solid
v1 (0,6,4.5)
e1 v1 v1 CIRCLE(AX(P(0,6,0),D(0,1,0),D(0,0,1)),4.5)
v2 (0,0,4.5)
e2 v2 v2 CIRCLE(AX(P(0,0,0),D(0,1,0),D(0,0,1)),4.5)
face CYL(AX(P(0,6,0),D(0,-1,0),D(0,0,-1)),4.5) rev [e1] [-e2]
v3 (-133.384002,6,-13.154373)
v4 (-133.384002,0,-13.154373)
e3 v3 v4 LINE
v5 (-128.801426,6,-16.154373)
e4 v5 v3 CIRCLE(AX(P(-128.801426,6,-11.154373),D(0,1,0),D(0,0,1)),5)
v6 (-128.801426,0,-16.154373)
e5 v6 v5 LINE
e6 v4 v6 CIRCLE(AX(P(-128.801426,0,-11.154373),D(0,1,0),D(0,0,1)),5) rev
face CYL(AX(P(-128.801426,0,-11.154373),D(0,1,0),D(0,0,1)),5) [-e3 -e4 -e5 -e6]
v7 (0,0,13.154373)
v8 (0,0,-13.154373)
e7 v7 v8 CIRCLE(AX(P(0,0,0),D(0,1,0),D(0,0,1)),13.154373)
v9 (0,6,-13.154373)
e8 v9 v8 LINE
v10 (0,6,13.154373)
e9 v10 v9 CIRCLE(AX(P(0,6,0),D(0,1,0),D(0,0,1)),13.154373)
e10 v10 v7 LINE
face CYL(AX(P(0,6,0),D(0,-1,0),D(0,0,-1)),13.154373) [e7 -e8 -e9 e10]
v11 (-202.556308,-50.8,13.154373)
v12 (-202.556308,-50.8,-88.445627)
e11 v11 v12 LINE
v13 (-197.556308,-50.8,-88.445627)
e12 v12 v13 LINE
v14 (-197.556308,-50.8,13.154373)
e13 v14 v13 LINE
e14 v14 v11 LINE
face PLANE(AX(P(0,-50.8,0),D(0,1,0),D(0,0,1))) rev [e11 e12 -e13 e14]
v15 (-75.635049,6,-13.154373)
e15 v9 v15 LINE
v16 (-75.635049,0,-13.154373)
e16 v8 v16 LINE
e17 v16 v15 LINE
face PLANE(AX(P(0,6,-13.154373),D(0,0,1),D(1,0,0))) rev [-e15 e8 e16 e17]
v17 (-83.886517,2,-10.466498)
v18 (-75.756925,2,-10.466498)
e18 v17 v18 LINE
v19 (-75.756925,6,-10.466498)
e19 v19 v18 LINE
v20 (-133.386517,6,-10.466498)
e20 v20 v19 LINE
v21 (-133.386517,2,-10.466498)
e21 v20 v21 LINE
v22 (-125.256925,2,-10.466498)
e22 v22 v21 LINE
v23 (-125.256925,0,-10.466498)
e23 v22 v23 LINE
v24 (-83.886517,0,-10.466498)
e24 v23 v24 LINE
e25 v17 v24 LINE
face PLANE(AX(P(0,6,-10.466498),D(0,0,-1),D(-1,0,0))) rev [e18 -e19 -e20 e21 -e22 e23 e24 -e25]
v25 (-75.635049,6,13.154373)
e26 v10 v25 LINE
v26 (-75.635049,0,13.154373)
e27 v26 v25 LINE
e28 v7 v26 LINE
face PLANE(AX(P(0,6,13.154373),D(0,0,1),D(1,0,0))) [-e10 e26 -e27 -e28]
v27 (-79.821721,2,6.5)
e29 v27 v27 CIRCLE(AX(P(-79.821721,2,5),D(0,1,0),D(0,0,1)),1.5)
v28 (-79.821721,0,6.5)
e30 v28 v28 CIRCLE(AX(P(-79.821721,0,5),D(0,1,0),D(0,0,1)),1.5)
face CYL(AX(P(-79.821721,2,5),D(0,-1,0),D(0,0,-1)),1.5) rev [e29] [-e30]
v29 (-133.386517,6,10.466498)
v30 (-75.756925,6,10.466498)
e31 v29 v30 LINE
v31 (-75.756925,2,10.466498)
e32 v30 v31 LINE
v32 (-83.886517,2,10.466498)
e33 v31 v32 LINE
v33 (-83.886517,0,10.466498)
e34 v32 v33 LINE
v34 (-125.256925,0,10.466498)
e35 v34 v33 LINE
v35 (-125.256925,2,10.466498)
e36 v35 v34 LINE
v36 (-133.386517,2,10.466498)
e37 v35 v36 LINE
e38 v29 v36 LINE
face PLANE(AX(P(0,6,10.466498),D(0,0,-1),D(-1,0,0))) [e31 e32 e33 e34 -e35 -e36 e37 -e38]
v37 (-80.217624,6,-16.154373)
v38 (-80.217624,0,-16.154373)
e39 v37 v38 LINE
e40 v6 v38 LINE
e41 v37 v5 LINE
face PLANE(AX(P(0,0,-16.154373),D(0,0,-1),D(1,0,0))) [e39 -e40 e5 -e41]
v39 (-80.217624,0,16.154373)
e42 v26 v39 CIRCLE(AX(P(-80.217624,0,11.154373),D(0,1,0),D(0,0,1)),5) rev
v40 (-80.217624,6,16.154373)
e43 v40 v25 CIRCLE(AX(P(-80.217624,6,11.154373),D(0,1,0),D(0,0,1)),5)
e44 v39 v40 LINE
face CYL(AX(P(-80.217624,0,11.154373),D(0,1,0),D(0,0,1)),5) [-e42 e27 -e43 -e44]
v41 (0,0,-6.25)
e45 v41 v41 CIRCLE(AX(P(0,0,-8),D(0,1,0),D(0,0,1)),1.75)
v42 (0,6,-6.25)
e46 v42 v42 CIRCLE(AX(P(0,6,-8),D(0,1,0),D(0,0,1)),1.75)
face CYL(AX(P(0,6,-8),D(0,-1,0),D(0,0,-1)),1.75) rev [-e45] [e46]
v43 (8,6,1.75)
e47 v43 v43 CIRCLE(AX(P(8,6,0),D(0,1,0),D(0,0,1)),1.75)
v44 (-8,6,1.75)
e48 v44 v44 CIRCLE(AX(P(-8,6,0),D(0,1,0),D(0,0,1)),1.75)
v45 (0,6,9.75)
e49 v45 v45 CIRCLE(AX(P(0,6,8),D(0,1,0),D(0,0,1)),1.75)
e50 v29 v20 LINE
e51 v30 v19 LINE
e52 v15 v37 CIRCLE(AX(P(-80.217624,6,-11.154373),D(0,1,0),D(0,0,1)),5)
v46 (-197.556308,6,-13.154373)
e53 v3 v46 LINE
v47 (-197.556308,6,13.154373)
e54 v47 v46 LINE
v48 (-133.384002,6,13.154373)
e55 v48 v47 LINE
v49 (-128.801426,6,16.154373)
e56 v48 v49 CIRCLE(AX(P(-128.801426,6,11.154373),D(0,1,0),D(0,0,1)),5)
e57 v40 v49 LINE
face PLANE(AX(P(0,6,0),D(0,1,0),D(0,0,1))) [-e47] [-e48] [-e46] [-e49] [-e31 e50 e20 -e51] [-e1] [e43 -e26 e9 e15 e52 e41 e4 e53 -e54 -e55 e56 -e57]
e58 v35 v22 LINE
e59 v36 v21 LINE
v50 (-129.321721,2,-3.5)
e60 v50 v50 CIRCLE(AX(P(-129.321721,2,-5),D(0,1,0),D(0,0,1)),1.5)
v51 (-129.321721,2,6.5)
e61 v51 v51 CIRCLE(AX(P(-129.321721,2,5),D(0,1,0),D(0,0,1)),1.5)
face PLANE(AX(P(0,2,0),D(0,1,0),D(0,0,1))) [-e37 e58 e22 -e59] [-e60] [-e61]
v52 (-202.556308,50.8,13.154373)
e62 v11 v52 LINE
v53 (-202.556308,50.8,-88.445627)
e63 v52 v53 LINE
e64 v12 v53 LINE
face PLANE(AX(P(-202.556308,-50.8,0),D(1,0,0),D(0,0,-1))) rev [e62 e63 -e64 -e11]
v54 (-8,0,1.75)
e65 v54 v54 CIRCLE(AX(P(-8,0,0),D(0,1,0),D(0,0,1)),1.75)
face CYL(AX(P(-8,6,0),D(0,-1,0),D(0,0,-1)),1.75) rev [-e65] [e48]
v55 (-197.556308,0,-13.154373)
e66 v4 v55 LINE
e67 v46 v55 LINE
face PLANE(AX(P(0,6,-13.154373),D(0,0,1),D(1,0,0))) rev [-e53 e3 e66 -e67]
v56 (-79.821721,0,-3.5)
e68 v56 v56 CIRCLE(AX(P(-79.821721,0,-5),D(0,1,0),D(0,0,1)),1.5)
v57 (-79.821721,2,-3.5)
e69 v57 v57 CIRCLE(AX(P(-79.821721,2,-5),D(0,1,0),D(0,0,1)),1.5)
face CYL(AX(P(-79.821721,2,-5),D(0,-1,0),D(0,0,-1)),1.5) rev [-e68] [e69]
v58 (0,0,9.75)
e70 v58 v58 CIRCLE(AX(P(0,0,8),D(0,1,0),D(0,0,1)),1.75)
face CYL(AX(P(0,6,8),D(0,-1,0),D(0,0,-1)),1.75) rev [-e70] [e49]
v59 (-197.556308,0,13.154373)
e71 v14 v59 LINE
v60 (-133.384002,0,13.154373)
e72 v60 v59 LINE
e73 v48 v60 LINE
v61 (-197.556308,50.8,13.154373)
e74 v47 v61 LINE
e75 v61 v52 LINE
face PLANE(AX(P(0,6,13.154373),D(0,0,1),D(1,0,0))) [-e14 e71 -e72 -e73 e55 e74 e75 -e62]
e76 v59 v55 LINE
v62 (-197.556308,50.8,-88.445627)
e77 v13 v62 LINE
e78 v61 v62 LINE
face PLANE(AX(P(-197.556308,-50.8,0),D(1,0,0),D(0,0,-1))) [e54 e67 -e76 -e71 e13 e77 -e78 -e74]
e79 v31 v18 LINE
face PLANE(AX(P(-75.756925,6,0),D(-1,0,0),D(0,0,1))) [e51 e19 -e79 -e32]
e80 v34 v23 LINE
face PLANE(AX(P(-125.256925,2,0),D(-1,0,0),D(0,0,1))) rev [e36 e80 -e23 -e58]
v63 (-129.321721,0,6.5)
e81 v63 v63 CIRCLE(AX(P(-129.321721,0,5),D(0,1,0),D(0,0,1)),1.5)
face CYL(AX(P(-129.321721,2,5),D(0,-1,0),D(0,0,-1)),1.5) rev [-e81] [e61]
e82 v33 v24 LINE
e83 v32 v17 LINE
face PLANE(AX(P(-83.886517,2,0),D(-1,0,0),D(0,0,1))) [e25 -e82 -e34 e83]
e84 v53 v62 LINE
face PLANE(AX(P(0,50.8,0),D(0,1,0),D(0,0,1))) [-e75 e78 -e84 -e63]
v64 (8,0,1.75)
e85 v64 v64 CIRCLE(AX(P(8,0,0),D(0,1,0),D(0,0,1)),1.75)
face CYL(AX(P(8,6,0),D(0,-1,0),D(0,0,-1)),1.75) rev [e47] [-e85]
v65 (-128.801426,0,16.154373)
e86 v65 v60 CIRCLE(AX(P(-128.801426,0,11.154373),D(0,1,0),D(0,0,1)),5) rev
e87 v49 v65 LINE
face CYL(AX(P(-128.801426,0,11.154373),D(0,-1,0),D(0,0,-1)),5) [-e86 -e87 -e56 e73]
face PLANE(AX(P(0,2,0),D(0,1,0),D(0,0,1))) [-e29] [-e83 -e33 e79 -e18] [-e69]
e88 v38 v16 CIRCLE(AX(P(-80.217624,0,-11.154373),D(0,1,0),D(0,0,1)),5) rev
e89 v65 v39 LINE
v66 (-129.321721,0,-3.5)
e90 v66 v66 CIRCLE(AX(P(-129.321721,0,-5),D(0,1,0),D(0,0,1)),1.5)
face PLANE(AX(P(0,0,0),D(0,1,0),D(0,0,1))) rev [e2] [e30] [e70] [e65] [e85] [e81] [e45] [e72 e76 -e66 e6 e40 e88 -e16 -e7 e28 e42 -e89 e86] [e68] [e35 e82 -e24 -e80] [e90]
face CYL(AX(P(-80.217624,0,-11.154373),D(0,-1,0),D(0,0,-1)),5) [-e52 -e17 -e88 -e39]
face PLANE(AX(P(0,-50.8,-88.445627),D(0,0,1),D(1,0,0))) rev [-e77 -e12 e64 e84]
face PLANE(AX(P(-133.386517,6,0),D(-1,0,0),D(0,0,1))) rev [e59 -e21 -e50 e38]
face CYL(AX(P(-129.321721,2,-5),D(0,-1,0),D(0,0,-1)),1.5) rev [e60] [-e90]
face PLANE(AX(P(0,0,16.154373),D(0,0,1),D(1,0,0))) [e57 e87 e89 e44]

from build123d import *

# Parameters (mm, degrees)
SKETCH1_W                = 57.629592668
SKETCH1_H                = 21.211867522
SKETCH1_R                = 1.75
SKETCH1_R_2              = 4.5
BOSS_EXTRUDE1_DEPTH      = 6
SKETCH1_22_W             = 8.129592668
SKETCH1_22_H             = 21.211867522
SKETCH1_22_R             = 1.5
BOSS_EXTRUDE2_DEPTH      = 2
BOSS_EXTRUDE3_DEPTH      = 50.8
BOSS_EXTRUDE3_DEPTH_BACK = 50.8
SKETCH1_23_W             = 5
SKETCH1_23_H             = 75.291254256
SKETCH1_23_H_2           = 26.308745744
SKETCH4_W                = 57.748953374
SKETCH4_H                = 6
BOSS_EXTRUDE4_DEPTH      = 3
FILLET2_R                = 5
FILLET2_OF_MIRROR1_R     = 5


with BuildPart() as part:
    # Sketch1 → Boss-Extrude1 (new body)
    with BuildSketch(Plane(origin=(0, 0, 0), x_dir=(1, 0, 0), z_dir=(0, 1, 0))):
        with BuildLine():
            Line((-197.556308439, -13.154372872), (0, -13.154372872))
            ThreePointArc((0, -13.154372872), (13.154372872, 0), (0, 13.154372872))
            Line((0, 13.154372872), (-197.556308439, 13.154372872))
            Line((-197.556308439, 13.154372872), (-197.556308439, -13.154372872))
        make_face()
        with Locations((-104.57172107, -0.139435446)):
            Rectangle(SKETCH1_W, SKETCH1_H, mode=Mode.SUBTRACT)
        with Locations(Location((0, 8, 0), (0, 0, 270))):
            Circle(SKETCH1_R, mode=Mode.SUBTRACT)
        with Locations(Location((0, -8, 0), (0, 0, 270))):
            Circle(SKETCH1_R, mode=Mode.SUBTRACT)
        with Locations(Location((-8, 0, 0), (0, 0, 270))):
            Circle(SKETCH1_R, mode=Mode.SUBTRACT)
        with Locations(Location((0, 0, 0), (0, 0, 270))):
            Circle(SKETCH1_R_2, mode=Mode.SUBTRACT)
        with Locations(Location((8, 0, 0), (0, 0, 270))):
            Circle(SKETCH1_R, mode=Mode.SUBTRACT)
    boss_extrude1 = extrude(amount=BOSS_EXTRUDE1_DEPTH)

    # Sketch1<22> → Boss-Extrude2 (add)
    # profile 1 of 2: a face of its own
    with BuildSketch(Plane(origin=(0, 0, 0), x_dir=(1, 0, 0), z_dir=(0, 1, 0))):
        with Locations((-129.32172107, -0.139435446)):
            Rectangle(SKETCH1_22_W, SKETCH1_22_H)
        with Locations(Location((-129.32172107, -5, 0), (0, 0, 270))):
            Circle(SKETCH1_22_R, mode=Mode.SUBTRACT)
        with Locations(Location((-129.32172107, 5, 0), (0, 0, 270))):
            Circle(SKETCH1_22_R, mode=Mode.SUBTRACT)
    # profile 2 of 2: a face of its own
    with BuildSketch(Plane(origin=(0, 0, 0), x_dir=(1, 0, 0), z_dir=(0, 1, 0))):
        with Locations((-79.82172107, -0.139435446)):
            Rectangle(SKETCH1_22_W, SKETCH1_22_H)
        with Locations(Location((-79.82172107, -5, 0), (0, 0, 270))):
            Circle(SKETCH1_22_R, mode=Mode.SUBTRACT)
        with Locations(Location((-79.82172107, 5, 0), (0, 0, 270))):
            Circle(SKETCH1_22_R, mode=Mode.SUBTRACT)
    extrude(amount=BOSS_EXTRUDE2_DEPTH)

    # Sketch1<23> → Boss-Extrude3 (add, two sides: drawn at the far end of the back side and taken through both)
    with BuildSketch(Plane(origin=(0, 0, 0), x_dir=(1, 0, 0), z_dir=(0, 1, 0)).offset(-BOSS_EXTRUDE3_DEPTH_BACK)):
        with Locations((-200.056308439, 50.8)):
            Rectangle(SKETCH1_23_W, SKETCH1_23_H)
        with Locations((-200.056308439, 0)):
            Rectangle(SKETCH1_23_W, SKETCH1_23_H_2)
    extrude(amount=BOSS_EXTRUDE3_DEPTH + BOSS_EXTRUDE3_DEPTH_BACK)

    # Sketch4 → Boss-Extrude4 (add)
    with BuildSketch(Plane.XY.offset(13.154372872)):
        with Locations((-104.509525291, 3)):
            Rectangle(SKETCH4_W, SKETCH4_H)
    boss_extrude4 = extrude(amount=BOSS_EXTRUDE4_DEPTH)

    # Fillet2
    # the kernel refuses this fillet: 5 mm, written as the material it takes off along each edge
    with BuildSketch(Plane(origin=(-75.635048604, -11.456439237, 16.154372872), x_dir=(-1, 0, 0), z_dir=(0, 1, 0))) as fillet2_piece_1:
        with BuildLine():
            CenterArc((4.582575695, -5), FILLET2_R, 90, 66.421821522)
            Line((0, -3), (-0.091651514, -2.96))
            ThreePointArc((-0.091651514, -2.96), (-0.1, -1.5), (-0.1, 0))
            Line((-0.1, 0), (0, 0.1))
            Line((0, 0.1), (4.582575695, 0.1))
            Line((4.582575695, 0.1), (4.582575695, 0))
        make_face()
    extrude(amount=28.912878475, mode=Mode.SUBTRACT)
    with BuildSketch(Plane(origin=(-133.384001978, 17.456439237, 16.154372872), x_dir=(0, 0, -1), z_dir=(0, -1, 0))) as fillet2_piece_2:
        with BuildLine():
            CenterArc((5, 4.582575695), FILLET2_R, 180, 66.421821522)
            Line((0, 4.582575695), (-0.1, 4.582575695))
            Line((-0.1, 4.582575695), (-0.1, 0))
            Line((-0.1, 0), (0, -0.1))
            ThreePointArc((0, -0.1), (1.5, -0.1), (2.96, -0.091651514))
            Line((2.96, -0.091651514), (3, 0))
        make_face()
    extrude(amount=28.912878475, mode=Mode.SUBTRACT)

    # Mirror1: Boss-Extrude1, Boss-Extrude4 across plane
    add(boss_extrude1.mirror(Plane(origin=(0, 0, 0), x_dir=(1, 0, 0), z_dir=(0, 0, -1))))
    add(boss_extrude4.mirror(Plane(origin=(0, 0, 0), x_dir=(1, 0, 0), z_dir=(0, 0, -1))))

    # Fillet2 of Mirror1
    # the kernel refuses this fillet: 5 mm, written as the material it takes off along each edge
    with BuildSketch(Plane(origin=(-75.635048604, -11.456439237, -16.154372872), x_dir=(0, 0, 1), z_dir=(0, 1, 0)), Plane(origin=(-133.384001978, 17.456439237, -16.154372872), x_dir=(0, 0, 1), z_dir=(0, -1, 0))) as fillet2_of_mirror1_piece_1:
        with BuildLine():
            CenterArc((5, -4.582575695), FILLET2_OF_MIRROR1_R, 113.578178478, 66.421821522)
            Line((0, -4.582575695), (-0.1, -4.582575695))
            Line((-0.1, -4.582575695), (-0.1, 0))
            Line((-0.1, 0), (0, 0.1))
            ThreePointArc((0, 0.1), (1.5, 0.1), (2.96, 0.091651514))
            Line((2.96, 0.091651514), (3, 0))
        make_face()
    extrude(amount=28.912878475, mode=Mode.SUBTRACT)


solid = part.part
